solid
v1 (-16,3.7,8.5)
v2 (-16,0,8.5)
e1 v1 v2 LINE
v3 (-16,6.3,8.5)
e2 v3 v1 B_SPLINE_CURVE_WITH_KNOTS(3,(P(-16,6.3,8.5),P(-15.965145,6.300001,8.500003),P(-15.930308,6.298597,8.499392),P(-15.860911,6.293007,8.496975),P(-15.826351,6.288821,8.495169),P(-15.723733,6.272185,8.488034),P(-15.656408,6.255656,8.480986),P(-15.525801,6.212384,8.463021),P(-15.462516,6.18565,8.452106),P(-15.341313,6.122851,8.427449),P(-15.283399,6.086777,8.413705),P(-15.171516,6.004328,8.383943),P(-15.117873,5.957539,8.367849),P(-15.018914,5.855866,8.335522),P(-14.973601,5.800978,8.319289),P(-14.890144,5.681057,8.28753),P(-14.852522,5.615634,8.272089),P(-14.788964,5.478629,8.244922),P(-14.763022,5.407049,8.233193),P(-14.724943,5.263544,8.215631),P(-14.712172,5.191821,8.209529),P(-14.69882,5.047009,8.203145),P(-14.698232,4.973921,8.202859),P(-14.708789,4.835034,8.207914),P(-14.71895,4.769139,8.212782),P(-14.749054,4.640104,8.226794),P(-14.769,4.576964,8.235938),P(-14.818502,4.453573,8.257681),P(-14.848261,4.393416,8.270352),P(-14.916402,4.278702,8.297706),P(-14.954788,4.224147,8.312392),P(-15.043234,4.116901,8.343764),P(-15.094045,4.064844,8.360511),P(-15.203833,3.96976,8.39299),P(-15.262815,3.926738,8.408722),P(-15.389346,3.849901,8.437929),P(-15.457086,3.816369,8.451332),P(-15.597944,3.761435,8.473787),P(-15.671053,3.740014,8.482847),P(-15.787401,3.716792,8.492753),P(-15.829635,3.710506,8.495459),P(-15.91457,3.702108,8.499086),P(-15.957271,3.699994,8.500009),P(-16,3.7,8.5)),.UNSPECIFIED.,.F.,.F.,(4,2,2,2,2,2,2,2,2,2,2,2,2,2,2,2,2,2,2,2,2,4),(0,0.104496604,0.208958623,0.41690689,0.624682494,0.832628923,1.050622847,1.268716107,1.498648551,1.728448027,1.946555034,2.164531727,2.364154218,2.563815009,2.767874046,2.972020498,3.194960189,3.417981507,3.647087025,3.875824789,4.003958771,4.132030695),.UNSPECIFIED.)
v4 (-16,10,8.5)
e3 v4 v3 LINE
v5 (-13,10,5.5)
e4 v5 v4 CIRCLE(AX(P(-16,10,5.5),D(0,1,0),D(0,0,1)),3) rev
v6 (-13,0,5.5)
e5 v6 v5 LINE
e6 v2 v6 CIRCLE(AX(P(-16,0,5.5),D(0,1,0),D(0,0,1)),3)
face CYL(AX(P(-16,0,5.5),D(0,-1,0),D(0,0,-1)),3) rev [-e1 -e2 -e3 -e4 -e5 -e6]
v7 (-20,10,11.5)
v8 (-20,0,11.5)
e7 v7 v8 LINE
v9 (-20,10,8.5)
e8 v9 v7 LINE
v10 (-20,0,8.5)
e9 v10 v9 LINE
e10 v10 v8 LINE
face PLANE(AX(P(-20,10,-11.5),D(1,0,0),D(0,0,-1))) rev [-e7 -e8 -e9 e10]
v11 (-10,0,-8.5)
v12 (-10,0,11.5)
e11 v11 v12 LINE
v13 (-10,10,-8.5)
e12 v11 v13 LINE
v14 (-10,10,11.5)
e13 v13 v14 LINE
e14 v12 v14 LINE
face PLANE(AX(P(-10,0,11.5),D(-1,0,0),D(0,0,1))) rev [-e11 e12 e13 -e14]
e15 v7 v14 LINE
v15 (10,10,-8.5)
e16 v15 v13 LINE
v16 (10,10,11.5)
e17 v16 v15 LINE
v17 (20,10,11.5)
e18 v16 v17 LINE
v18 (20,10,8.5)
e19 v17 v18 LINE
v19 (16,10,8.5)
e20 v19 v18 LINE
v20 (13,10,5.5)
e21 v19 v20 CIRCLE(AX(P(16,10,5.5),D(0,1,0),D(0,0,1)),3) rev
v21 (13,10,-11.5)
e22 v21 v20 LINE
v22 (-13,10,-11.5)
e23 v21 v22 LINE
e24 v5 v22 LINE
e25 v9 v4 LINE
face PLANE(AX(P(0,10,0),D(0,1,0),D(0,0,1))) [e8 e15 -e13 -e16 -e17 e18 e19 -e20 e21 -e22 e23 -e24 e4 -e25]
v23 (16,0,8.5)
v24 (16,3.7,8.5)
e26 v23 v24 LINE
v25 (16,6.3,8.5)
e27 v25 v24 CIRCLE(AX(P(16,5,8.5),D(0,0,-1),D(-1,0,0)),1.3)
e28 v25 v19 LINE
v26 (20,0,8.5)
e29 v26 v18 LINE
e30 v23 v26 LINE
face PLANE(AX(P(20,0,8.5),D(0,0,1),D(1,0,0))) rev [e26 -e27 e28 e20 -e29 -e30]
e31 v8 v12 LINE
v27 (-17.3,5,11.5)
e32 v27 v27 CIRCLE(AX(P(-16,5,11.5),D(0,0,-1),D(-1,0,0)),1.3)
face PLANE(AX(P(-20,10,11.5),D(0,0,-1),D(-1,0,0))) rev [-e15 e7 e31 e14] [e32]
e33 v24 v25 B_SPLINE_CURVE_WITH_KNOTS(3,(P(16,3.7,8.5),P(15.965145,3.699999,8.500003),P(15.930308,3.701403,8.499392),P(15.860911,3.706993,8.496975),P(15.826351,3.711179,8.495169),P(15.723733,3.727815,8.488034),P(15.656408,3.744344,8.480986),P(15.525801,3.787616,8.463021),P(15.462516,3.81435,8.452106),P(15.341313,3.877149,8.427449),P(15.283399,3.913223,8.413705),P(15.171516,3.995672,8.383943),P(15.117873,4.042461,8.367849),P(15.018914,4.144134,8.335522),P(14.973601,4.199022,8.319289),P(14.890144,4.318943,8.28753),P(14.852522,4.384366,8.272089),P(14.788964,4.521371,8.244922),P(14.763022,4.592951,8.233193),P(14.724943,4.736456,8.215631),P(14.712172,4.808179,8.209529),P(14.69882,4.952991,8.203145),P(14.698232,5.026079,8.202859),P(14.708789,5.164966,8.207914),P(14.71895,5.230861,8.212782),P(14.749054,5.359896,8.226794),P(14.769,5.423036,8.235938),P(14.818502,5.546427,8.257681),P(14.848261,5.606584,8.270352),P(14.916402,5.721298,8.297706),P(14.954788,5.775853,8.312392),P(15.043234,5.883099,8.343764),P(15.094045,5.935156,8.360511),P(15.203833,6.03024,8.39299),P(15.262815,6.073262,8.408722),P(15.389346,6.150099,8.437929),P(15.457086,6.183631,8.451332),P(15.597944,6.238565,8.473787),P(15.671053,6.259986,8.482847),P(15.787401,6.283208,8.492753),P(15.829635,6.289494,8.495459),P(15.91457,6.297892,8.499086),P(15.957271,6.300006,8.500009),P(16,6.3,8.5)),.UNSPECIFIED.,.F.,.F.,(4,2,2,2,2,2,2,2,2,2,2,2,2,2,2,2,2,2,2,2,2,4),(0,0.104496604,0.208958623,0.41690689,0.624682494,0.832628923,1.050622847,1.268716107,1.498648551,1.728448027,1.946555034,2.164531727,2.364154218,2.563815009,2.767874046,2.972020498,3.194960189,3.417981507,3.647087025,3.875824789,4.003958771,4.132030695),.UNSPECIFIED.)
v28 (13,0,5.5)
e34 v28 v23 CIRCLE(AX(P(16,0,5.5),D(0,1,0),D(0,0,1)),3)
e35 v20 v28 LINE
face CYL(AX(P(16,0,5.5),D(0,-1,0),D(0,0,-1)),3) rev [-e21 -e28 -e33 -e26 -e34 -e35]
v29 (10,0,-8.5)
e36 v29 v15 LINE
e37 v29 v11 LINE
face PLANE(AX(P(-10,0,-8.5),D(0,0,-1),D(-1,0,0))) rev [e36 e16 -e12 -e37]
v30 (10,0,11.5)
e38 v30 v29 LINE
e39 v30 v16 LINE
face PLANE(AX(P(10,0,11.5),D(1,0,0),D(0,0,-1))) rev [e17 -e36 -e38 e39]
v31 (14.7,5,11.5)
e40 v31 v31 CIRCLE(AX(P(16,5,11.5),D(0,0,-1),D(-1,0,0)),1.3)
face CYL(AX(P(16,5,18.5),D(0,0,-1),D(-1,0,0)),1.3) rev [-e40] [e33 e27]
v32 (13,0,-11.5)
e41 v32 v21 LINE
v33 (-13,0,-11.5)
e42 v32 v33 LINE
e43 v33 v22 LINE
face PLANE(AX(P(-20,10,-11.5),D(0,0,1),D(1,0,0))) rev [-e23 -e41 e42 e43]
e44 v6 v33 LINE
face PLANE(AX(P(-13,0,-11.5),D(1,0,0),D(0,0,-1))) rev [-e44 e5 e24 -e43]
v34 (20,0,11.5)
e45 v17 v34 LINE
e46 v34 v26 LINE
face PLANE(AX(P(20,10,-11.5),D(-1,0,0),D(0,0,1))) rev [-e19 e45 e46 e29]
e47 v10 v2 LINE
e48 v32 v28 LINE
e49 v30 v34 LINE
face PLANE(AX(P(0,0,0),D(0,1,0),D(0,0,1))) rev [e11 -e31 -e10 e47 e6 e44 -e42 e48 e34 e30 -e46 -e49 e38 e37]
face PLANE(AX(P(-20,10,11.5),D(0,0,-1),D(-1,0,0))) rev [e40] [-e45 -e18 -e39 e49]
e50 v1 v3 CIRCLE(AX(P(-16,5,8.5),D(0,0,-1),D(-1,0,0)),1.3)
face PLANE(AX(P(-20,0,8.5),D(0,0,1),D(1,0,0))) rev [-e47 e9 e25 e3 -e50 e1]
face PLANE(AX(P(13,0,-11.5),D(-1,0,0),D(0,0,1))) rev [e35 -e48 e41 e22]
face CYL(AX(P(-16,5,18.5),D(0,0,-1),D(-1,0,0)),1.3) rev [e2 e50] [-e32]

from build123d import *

# Parameters (mm, degrees)
SKETCH_1_W          = 40
SKETCH_1_H          = 23
EXTRUDE_1_DEPTH     = 10
SKETCH_2_W          = 7
SKETCH_2_H          = 20
CUT_EXTRUDE_1_DEPTH = 10
SKETCH_3_W          = 20
SKETCH_3_H          = 20
CUT_EXTRUDE_2_DEPTH = 10
SKETCH_4_R          = 1.3
CUT_EXTRUDE_3_DEPTH = 10
FILLET_1_R          = 3
FILLET_2_R          = 3


with BuildPart() as part:
    # 草图1 → 凸台-拉伸1 (new body)
    with BuildSketch(Plane(origin=(0, 0, 0), x_dir=(1, 0, 0), z_dir=(0, 1, 0))):
        Rectangle(SKETCH_1_W, SKETCH_1_H)
    extrude(amount=EXTRUDE_1_DEPTH)

    # 草图2 → 切除-拉伸1 (cut)
    with BuildSketch(Plane(origin=(0, 10, 0), x_dir=(1, 0, 0), z_dir=(0, 1, 0))):
        with Locations((-16.5, 1.5)):
            Rectangle(SKETCH_2_W, SKETCH_2_H)
        with Locations((16.5, 1.5)):
            Rectangle(SKETCH_2_W, SKETCH_2_H)
    extrude(amount=-CUT_EXTRUDE_1_DEPTH, mode=Mode.SUBTRACT)

    # 草图3 → 切除-拉伸2 (cut)
    with BuildSketch(Plane(origin=(0, 10, 0), x_dir=(1, 0, 0), z_dir=(0, 1, 0))):
        with Locations((0, -1.5)):
            Rectangle(SKETCH_3_W, SKETCH_3_H)
    extrude(amount=-CUT_EXTRUDE_2_DEPTH, mode=Mode.SUBTRACT)

    # 草图4 → 切除-拉伸3 (cut)
    with BuildSketch(Plane(origin=(0, 0, 8.5), x_dir=(-1, 0, 0), z_dir=(0, 0, -1))):
        with Locations((16, 5)):
            Circle(SKETCH_4_R)
        with Locations((-16, 5)):
            Circle(SKETCH_4_R)
    extrude(amount=-CUT_EXTRUDE_3_DEPTH, mode=Mode.SUBTRACT)

    # 圆角1
    # the kernel refuses this fillet: 3 mm, written as the material it adds along each edge
    with BuildSketch(Plane(origin=(13, 10, 8.5), x_dir=(0, 0, -1), z_dir=(0, -1, 0))) as fillet_1_piece_1_section:
        with BuildLine():
            CenterArc((FILLET_1_R, FILLET_1_R), FILLET_1_R, 180, 90)
            Line((0, FILLET_1_R), (0, 0))
            Line((0, 0), (FILLET_1_R, 0))
        make_face()
    fillet_1_piece_1 = extrude(amount=10, mode=Mode.PRIVATE)
    fillet_1_piece_1 = fillet_1_piece_1 - Plane(origin=(16, 5, 7.810677701), x_dir=(-1, 0, 0), z_dir=(0, 0, -1)) * Cylinder(1.3, 32, mode=Mode.PRIVATE)
    add(fillet_1_piece_1)

    # 圆角2
    # the kernel refuses this fillet: 3 mm, written as the material it adds along each edge
    with BuildSketch(Plane(origin=(-13, 10, 8.5), x_dir=(0, 0, -1), z_dir=(0, -1, 0))) as fillet_2_piece_1_section:
        with BuildLine():
            CenterArc((FILLET_2_R, -FILLET_2_R), FILLET_2_R, 90, 90)
            Line((0, -FILLET_2_R), (0, 0))
            Line((0, 0), (FILLET_2_R, 0))
        make_face()
    fillet_2_piece_1 = extrude(amount=10, mode=Mode.PRIVATE)
    fillet_2_piece_1 = fillet_2_piece_1 - Plane(origin=(-16, 5, 7.810678225), x_dir=(-1, 0, 0), z_dir=(0, 0, -1)) * Cylinder(1.3, 32, mode=Mode.PRIVATE)
    add(fillet_2_piece_1)


solid = part.part
